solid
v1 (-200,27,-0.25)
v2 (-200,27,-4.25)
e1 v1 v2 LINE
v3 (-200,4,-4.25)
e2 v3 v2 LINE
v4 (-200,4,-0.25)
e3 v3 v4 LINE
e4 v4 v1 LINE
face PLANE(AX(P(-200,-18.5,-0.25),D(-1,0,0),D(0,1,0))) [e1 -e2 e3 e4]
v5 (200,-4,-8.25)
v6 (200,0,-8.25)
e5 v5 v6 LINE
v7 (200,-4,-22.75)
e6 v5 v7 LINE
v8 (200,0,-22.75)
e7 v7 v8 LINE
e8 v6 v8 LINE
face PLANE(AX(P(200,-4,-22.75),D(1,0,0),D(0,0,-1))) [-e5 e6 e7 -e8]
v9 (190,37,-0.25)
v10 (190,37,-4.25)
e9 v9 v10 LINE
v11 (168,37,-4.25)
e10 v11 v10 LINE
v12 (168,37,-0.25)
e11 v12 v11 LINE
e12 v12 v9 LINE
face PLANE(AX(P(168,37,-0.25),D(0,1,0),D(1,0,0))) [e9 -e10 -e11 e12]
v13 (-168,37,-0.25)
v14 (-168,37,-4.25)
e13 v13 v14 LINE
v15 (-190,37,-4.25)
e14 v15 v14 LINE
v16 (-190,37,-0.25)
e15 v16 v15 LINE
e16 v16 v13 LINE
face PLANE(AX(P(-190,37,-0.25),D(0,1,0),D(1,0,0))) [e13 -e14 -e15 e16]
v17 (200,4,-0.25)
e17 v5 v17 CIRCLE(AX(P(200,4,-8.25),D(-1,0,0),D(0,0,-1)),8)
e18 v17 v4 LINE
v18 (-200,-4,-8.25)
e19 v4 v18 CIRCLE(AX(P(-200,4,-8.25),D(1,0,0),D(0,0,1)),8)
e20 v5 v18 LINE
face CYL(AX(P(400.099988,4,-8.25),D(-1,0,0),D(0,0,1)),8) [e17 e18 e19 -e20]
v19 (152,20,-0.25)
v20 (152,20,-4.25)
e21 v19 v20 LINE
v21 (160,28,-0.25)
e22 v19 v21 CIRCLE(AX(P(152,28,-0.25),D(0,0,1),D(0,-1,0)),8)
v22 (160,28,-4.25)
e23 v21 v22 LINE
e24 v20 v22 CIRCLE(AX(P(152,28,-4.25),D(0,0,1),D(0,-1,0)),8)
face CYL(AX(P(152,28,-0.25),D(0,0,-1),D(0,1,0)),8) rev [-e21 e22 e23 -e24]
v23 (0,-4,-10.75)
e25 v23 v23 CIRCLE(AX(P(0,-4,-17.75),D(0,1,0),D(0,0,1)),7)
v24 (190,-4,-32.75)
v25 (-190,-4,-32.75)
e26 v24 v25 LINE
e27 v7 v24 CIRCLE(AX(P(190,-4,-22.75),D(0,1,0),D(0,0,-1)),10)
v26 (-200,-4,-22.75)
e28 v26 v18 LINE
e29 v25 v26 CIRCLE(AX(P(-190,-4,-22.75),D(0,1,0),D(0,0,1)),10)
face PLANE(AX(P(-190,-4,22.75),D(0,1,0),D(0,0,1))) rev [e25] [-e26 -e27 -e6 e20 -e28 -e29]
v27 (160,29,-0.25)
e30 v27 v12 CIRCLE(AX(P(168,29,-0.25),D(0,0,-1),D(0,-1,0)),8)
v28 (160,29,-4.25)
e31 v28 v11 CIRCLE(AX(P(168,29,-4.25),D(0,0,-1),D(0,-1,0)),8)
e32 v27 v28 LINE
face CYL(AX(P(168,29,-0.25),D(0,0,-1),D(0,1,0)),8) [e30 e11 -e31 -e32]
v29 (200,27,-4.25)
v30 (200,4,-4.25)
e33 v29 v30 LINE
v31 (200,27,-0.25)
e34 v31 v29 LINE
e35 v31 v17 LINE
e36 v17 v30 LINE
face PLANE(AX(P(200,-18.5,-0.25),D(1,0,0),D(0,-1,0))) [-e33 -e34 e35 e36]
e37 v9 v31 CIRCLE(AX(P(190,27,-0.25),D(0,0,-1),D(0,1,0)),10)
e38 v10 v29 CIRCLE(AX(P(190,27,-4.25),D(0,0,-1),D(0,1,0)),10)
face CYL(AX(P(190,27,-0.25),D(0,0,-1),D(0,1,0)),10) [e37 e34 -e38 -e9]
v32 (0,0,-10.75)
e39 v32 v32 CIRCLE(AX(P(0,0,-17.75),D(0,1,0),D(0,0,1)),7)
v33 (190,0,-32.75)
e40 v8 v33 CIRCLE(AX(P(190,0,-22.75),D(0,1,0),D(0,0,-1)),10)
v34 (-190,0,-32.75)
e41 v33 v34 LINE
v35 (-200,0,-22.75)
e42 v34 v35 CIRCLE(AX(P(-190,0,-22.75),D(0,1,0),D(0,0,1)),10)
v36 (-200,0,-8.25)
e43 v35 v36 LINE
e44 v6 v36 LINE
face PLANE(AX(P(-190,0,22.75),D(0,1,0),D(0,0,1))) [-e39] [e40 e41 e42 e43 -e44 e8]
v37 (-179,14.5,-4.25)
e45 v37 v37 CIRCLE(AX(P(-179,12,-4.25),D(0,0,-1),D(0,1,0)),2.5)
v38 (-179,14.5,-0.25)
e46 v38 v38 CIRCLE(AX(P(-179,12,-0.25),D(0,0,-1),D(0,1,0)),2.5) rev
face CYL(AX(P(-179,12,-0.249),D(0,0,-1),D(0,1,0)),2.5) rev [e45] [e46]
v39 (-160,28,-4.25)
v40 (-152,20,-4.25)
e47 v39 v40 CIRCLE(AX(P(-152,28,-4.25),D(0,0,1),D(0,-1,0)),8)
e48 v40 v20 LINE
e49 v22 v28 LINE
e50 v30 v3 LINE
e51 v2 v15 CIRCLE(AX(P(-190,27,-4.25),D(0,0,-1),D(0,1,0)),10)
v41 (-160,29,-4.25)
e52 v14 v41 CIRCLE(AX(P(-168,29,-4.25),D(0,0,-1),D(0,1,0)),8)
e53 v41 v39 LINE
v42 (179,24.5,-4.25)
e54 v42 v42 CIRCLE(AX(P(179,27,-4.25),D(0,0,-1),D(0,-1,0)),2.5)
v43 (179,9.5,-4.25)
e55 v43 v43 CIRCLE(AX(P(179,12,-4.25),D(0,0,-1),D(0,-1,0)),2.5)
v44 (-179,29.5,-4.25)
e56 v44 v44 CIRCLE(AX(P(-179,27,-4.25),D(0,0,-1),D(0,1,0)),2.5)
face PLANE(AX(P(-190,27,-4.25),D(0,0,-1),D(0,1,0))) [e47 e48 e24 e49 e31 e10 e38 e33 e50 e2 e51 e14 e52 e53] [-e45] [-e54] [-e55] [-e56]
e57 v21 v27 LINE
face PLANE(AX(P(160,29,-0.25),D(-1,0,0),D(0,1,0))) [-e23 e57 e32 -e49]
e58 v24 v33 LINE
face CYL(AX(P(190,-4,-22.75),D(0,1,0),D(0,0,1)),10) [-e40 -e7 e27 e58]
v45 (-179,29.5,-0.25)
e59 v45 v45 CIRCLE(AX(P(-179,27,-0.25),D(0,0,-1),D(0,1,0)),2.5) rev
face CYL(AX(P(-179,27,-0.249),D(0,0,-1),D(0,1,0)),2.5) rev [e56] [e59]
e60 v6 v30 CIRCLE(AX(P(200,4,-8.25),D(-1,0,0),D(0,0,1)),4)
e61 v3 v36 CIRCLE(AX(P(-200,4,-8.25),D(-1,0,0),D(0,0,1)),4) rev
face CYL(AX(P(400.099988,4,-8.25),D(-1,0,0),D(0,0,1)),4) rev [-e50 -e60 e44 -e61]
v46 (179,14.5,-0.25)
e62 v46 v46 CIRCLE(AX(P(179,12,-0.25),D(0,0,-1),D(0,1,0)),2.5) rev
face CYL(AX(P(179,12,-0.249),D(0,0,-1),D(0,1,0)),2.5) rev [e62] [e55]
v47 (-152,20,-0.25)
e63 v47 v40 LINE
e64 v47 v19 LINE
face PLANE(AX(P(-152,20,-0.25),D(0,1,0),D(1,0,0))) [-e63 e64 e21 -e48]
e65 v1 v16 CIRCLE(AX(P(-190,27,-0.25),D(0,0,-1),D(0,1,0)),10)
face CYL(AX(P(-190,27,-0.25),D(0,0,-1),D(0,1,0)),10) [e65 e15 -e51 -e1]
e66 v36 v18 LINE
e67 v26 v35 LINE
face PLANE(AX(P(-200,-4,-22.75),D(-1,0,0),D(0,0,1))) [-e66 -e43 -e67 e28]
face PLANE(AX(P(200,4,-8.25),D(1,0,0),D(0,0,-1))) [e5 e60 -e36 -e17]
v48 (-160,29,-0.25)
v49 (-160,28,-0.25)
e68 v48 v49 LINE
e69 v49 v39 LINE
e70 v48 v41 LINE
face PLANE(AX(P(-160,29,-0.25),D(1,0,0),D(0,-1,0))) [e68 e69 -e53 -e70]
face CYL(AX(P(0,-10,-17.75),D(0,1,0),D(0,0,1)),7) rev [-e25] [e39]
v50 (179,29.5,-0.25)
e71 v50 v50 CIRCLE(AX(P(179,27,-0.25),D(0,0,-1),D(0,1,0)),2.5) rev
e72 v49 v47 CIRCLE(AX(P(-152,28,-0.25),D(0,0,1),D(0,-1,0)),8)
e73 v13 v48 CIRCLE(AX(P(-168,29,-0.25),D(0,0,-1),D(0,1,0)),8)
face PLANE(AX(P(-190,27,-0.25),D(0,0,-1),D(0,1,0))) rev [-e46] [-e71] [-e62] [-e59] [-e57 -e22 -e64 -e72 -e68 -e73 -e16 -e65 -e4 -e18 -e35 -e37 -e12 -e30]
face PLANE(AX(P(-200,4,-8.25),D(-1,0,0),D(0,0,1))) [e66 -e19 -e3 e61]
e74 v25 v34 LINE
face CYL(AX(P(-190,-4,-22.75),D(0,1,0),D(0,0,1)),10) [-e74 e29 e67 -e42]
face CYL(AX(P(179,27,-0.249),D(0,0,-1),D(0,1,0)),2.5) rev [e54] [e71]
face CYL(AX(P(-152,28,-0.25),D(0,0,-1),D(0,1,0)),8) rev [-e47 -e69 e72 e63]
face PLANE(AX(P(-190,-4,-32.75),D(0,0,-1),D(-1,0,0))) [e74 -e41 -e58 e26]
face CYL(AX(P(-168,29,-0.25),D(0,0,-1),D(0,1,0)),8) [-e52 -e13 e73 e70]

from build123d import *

# Parameters (mm, degrees)
BRIDA_BASE1_DEPTH             = 4
PLIEGUE_START                 = -1.07192
PLIEGUE_CROQUIZADO1_OUTLINE_W = 400
PLIEGUE_CROQUIZADO1_OUTLINE_H = 4
PLIEGUE_CROQUIZADO1_DEPTH     = 33.82192
PLIEGUE_START_2               = -4.25
PLIEGUE_CROQUIZADO1_2_DEPTH   = 0.02192
PLIEGUE_START_3               = -8.25
PLIEGUE_CROQUIZADO1_3_DEPTH   = 8
PLIEGUE_START_4               = -200
PLIEGUE_CROQUIZADO1_4_DEPTH   = 400
CROQUIS8_R                    = 7
CORTAR_EXTRUIR2_DEPTH         = 10
CORTAR_EXTRUIR3_REACH         = 207.381
CROQUIS9_R                    = 2.5


with BuildPart() as part:
    # Brida base1: sheet metal written as solids
    # Croquis1 → Brida base1 (new body)
    with BuildSketch(Plane(origin=(0, 0, 0), x_dir=(1, 0, 0), z_dir=(0, 1, 0))):
        with BuildLine():
            Line((168, -32.75), (190, -32.75))
            ThreePointArc((190, -32.75), (197.071067812, -29.821067812), (200, -22.75))
            Line((200, -22.75), (200, 22.75))
            ThreePointArc((200, 22.75), (197.071067812, 29.821067812), (190, 32.75))
            Line((190, 32.75), (-190, 32.75))
            ThreePointArc((-190, 32.75), (-197.071067812, 29.821067812), (-200, 22.75))
            Line((-200, 22.75), (-200, -22.75))
            ThreePointArc((-200, -22.75), (-197.071067812, -29.821067812), (-190, -32.75))
            Line((-190, -32.75), (-168, -32.75))
            ThreePointArc((-168, -32.75), (-162.343145751, -30.406854249), (-160, -24.75))
            Line((-160, -24.75), (-160, -23.75))
            ThreePointArc((-160, -23.75), (-157.656854249, -18.093145751), (-152, -15.75))
            Line((-152, -15.75), (152, -15.75))
            ThreePointArc((152, -15.75), (157.656854249, -18.093145751), (160, -23.75))
            Line((160, -23.75), (160, -24.75))
            ThreePointArc((160, -24.75), (162.343145751, -30.406854249), (168, -32.75))
        make_face()
    extrude(amount=-BRIDA_BASE1_DEPTH)

    # Pliegue croquizado1: read off the stored shape, not the designer's step
    # Pliegue croquizado1 outline → Pliegue croquizado1 (cut)
    with BuildSketch(Plane.XY.offset(PLIEGUE_START)):
        with Locations((0, -2)):
            Rectangle(PLIEGUE_CROQUIZADO1_OUTLINE_W, PLIEGUE_CROQUIZADO1_OUTLINE_H)
    extrude(amount=PLIEGUE_CROQUIZADO1_DEPTH, mode=Mode.SUBTRACT)

    # Pliegue croquizado1 2 outline → Pliegue croquizado1 2 (add)
    with BuildSketch(Plane.XY.offset(PLIEGUE_START_2)):
        with BuildLine():
            ThreePointArc((-190, 36.999999998), (-197.071067812, 34.07106781), (-200, 26.999999998))
            Line((-200, 26.999999998), (-200, 0))
            Line((-200, 0), (200, 0))
            Line((200, 0), (200, 26.999999998))
            ThreePointArc((200, 26.999999998), (197.071067812, 34.07106781), (190, 36.999999998))
            Line((190, 36.999999998), (168, 36.999999998))
            ThreePointArc((168, 36.999999998), (162.343145751, 34.656854247), (160, 28.999999998))
            Line((160, 28.999999998), (160, 27.999999998))
            ThreePointArc((160, 27.999999998), (157.656854249, 22.343145749), (152, 19.999999998))
            Line((152, 19.999999998), (-152, 19.999999998))
            ThreePointArc((-152, 19.999999998), (-157.656854249, 22.343145749), (-160, 27.999999998))
            Line((-160, 27.999999998), (-160, 28.999999998))
            ThreePointArc((-160, 28.999999998), (-162.343145751, 34.656854248), (-168, 36.999999998))
            Line((-168, 36.999999998), (-190, 36.999999998))
        make_face()
    extrude(amount=PLIEGUE_CROQUIZADO1_2_DEPTH)

    # Pliegue croquizado1 3 outline → Pliegue croquizado1 3 (add)
    with BuildSketch(Plane.XY.offset(PLIEGUE_START_3)):
        with BuildLine():
            ThreePointArc((-190, 36.999999998), (-197.071067812, 34.07106781), (-200, 26.999999998))
            Line((-200, 26.999999998), (-200, 0))
            Line((-200, 0), (200, 0))
            Line((200, 0), (200, 26.999999998))
            ThreePointArc((200, 26.999999998), (197.071067812, 34.07106781), (190, 36.999999998))
            Line((190, 36.999999998), (168, 36.999999998))
            ThreePointArc((168, 36.999999998), (162.343145751, 34.656854247), (160, 28.999999998))
            Line((160, 28.999999998), (160, 27.999999998))
            ThreePointArc((160, 27.999999998), (157.656854249, 22.343145749), (152, 19.999999998))
            Line((152, 19.999999998), (-152, 19.999999998))
            ThreePointArc((-152, 19.999999998), (-157.656854249, 22.343145749), (-160, 27.999999998))
            Line((-160, 27.999999998), (-160, 28.999999998))
            ThreePointArc((-160, 28.999999998), (-162.343145751, 34.656854248), (-168, 36.999999998))
            Line((-168, 36.999999998), (-190, 36.999999998))
        make_face()
    extrude(amount=PLIEGUE_CROQUIZADO1_3_DEPTH)

    # Pliegue croquizado1 4 outline → Pliegue croquizado1 4 (cut)
    with BuildSketch(Plane.YZ.offset(PLIEGUE_START_4)):
        with BuildLine():
            ThreePointArc((-4, -8.25), (-1.656854249, -2.593145751), (4, -0.25))
            Line((4, -0.25), (0, -0.25))
            Line((0, -0.25), (0, -1.07192))
            Line((0, -1.07192), (-4, -1.07192))
            Line((-4, -1.07192), (-4, -8.25))
        make_face()
        with BuildLine():
            ThreePointArc((4, -4.25), (1.171572875, -5.421572875), (0, -8.25))
            Line((0, -8.25), (36.999999998, -8.25))
            Line((36.999999998, -8.25), (36.999999998, -4.25))
            Line((36.999999998, -4.25), (4, -4.25))
        make_face()
    extrude(amount=PLIEGUE_CROQUIZADO1_4_DEPTH, mode=Mode.SUBTRACT)

    # Croquis8 → Cortar-Extruir2 (cut)
    with BuildSketch(Plane(origin=(0, 0, 0), x_dir=(1, 0, 0), z_dir=(0, 1, 0))):
        with Locations(Location((0, 17.75, 0), (0, 0, 270))):
            Circle(CROQUIS8_R)
    extrude(amount=-CORTAR_EXTRUIR2_DEPTH, mode=Mode.SUBTRACT)

    # Croquis9 → Cortar-Extruir3 (cut, up to next)
    with BuildSketch(Plane(origin=(0, 0, -4.25), x_dir=(-1, 0, 0), z_dir=(0, 0, -1)), mode=Mode.PRIVATE) as cortar_extruir3_sk1:
        with Locations(Location((179, 11.999999998, 0), (0, 0, 90))):
            Circle(CROQUIS9_R)
    cortar_extruir3_tool1 = extrude(cortar_extruir3_sk1.sketch, amount=-CORTAR_EXTRUIR3_REACH, mode=Mode.PRIVATE) & part.part
    # Croquis9 → Cortar-Extruir3 (cut, up to next)
    with BuildSketch(Plane(origin=(0, 0, -4.25), x_dir=(-1, 0, 0), z_dir=(0, 0, -1)), mode=Mode.PRIVATE) as cortar_extruir3_sk2:
        with Locations(Location((179, 26.999999998, 0), (0, 0, 90))):
            Circle(CROQUIS9_R)
    cortar_extruir3_tool2 = extrude(cortar_extruir3_sk2.sketch, amount=-CORTAR_EXTRUIR3_REACH, mode=Mode.PRIVATE) & part.part
    # Croquis9 → Cortar-Extruir3 (cut, up to next)
    with BuildSketch(Plane(origin=(0, 0, -4.25), x_dir=(-1, 0, 0), z_dir=(0, 0, -1)), mode=Mode.PRIVATE) as cortar_extruir3_sk3:
        with Locations(Location((-179, 26.999999998, 0), (0, 0, 90))):
            Circle(CROQUIS9_R)
    cortar_extruir3_tool3 = extrude(cortar_extruir3_sk3.sketch, amount=-CORTAR_EXTRUIR3_REACH, mode=Mode.PRIVATE) & part.part
    # Croquis9 → Cortar-Extruir3 (cut, up to next)
    with BuildSketch(Plane(origin=(0, 0, -4.25), x_dir=(-1, 0, 0), z_dir=(0, 0, -1)), mode=Mode.PRIVATE) as cortar_extruir3_sk4:
        with Locations(Location((-179, 11.999999998, 0), (0, 0, 90))):
            Circle(CROQUIS9_R)
    cortar_extruir3_tool4 = extrude(cortar_extruir3_sk4.sketch, amount=-CORTAR_EXTRUIR3_REACH, mode=Mode.PRIVATE) & part.part
    add(cortar_extruir3_tool1.solids().sort_by_distance((-179, 12, -4.25))[0], mode=Mode.SUBTRACT)
    add(cortar_extruir3_tool2.solids().sort_by_distance((-179, 27, -4.25))[0], mode=Mode.SUBTRACT)
    add(cortar_extruir3_tool3.solids().sort_by_distance((179, 27, -4.25))[0], mode=Mode.SUBTRACT)
    add(cortar_extruir3_tool4.solids().sort_by_distance((179, 12, -4.25))[0], mode=Mode.SUBTRACT)


solid = part.part
